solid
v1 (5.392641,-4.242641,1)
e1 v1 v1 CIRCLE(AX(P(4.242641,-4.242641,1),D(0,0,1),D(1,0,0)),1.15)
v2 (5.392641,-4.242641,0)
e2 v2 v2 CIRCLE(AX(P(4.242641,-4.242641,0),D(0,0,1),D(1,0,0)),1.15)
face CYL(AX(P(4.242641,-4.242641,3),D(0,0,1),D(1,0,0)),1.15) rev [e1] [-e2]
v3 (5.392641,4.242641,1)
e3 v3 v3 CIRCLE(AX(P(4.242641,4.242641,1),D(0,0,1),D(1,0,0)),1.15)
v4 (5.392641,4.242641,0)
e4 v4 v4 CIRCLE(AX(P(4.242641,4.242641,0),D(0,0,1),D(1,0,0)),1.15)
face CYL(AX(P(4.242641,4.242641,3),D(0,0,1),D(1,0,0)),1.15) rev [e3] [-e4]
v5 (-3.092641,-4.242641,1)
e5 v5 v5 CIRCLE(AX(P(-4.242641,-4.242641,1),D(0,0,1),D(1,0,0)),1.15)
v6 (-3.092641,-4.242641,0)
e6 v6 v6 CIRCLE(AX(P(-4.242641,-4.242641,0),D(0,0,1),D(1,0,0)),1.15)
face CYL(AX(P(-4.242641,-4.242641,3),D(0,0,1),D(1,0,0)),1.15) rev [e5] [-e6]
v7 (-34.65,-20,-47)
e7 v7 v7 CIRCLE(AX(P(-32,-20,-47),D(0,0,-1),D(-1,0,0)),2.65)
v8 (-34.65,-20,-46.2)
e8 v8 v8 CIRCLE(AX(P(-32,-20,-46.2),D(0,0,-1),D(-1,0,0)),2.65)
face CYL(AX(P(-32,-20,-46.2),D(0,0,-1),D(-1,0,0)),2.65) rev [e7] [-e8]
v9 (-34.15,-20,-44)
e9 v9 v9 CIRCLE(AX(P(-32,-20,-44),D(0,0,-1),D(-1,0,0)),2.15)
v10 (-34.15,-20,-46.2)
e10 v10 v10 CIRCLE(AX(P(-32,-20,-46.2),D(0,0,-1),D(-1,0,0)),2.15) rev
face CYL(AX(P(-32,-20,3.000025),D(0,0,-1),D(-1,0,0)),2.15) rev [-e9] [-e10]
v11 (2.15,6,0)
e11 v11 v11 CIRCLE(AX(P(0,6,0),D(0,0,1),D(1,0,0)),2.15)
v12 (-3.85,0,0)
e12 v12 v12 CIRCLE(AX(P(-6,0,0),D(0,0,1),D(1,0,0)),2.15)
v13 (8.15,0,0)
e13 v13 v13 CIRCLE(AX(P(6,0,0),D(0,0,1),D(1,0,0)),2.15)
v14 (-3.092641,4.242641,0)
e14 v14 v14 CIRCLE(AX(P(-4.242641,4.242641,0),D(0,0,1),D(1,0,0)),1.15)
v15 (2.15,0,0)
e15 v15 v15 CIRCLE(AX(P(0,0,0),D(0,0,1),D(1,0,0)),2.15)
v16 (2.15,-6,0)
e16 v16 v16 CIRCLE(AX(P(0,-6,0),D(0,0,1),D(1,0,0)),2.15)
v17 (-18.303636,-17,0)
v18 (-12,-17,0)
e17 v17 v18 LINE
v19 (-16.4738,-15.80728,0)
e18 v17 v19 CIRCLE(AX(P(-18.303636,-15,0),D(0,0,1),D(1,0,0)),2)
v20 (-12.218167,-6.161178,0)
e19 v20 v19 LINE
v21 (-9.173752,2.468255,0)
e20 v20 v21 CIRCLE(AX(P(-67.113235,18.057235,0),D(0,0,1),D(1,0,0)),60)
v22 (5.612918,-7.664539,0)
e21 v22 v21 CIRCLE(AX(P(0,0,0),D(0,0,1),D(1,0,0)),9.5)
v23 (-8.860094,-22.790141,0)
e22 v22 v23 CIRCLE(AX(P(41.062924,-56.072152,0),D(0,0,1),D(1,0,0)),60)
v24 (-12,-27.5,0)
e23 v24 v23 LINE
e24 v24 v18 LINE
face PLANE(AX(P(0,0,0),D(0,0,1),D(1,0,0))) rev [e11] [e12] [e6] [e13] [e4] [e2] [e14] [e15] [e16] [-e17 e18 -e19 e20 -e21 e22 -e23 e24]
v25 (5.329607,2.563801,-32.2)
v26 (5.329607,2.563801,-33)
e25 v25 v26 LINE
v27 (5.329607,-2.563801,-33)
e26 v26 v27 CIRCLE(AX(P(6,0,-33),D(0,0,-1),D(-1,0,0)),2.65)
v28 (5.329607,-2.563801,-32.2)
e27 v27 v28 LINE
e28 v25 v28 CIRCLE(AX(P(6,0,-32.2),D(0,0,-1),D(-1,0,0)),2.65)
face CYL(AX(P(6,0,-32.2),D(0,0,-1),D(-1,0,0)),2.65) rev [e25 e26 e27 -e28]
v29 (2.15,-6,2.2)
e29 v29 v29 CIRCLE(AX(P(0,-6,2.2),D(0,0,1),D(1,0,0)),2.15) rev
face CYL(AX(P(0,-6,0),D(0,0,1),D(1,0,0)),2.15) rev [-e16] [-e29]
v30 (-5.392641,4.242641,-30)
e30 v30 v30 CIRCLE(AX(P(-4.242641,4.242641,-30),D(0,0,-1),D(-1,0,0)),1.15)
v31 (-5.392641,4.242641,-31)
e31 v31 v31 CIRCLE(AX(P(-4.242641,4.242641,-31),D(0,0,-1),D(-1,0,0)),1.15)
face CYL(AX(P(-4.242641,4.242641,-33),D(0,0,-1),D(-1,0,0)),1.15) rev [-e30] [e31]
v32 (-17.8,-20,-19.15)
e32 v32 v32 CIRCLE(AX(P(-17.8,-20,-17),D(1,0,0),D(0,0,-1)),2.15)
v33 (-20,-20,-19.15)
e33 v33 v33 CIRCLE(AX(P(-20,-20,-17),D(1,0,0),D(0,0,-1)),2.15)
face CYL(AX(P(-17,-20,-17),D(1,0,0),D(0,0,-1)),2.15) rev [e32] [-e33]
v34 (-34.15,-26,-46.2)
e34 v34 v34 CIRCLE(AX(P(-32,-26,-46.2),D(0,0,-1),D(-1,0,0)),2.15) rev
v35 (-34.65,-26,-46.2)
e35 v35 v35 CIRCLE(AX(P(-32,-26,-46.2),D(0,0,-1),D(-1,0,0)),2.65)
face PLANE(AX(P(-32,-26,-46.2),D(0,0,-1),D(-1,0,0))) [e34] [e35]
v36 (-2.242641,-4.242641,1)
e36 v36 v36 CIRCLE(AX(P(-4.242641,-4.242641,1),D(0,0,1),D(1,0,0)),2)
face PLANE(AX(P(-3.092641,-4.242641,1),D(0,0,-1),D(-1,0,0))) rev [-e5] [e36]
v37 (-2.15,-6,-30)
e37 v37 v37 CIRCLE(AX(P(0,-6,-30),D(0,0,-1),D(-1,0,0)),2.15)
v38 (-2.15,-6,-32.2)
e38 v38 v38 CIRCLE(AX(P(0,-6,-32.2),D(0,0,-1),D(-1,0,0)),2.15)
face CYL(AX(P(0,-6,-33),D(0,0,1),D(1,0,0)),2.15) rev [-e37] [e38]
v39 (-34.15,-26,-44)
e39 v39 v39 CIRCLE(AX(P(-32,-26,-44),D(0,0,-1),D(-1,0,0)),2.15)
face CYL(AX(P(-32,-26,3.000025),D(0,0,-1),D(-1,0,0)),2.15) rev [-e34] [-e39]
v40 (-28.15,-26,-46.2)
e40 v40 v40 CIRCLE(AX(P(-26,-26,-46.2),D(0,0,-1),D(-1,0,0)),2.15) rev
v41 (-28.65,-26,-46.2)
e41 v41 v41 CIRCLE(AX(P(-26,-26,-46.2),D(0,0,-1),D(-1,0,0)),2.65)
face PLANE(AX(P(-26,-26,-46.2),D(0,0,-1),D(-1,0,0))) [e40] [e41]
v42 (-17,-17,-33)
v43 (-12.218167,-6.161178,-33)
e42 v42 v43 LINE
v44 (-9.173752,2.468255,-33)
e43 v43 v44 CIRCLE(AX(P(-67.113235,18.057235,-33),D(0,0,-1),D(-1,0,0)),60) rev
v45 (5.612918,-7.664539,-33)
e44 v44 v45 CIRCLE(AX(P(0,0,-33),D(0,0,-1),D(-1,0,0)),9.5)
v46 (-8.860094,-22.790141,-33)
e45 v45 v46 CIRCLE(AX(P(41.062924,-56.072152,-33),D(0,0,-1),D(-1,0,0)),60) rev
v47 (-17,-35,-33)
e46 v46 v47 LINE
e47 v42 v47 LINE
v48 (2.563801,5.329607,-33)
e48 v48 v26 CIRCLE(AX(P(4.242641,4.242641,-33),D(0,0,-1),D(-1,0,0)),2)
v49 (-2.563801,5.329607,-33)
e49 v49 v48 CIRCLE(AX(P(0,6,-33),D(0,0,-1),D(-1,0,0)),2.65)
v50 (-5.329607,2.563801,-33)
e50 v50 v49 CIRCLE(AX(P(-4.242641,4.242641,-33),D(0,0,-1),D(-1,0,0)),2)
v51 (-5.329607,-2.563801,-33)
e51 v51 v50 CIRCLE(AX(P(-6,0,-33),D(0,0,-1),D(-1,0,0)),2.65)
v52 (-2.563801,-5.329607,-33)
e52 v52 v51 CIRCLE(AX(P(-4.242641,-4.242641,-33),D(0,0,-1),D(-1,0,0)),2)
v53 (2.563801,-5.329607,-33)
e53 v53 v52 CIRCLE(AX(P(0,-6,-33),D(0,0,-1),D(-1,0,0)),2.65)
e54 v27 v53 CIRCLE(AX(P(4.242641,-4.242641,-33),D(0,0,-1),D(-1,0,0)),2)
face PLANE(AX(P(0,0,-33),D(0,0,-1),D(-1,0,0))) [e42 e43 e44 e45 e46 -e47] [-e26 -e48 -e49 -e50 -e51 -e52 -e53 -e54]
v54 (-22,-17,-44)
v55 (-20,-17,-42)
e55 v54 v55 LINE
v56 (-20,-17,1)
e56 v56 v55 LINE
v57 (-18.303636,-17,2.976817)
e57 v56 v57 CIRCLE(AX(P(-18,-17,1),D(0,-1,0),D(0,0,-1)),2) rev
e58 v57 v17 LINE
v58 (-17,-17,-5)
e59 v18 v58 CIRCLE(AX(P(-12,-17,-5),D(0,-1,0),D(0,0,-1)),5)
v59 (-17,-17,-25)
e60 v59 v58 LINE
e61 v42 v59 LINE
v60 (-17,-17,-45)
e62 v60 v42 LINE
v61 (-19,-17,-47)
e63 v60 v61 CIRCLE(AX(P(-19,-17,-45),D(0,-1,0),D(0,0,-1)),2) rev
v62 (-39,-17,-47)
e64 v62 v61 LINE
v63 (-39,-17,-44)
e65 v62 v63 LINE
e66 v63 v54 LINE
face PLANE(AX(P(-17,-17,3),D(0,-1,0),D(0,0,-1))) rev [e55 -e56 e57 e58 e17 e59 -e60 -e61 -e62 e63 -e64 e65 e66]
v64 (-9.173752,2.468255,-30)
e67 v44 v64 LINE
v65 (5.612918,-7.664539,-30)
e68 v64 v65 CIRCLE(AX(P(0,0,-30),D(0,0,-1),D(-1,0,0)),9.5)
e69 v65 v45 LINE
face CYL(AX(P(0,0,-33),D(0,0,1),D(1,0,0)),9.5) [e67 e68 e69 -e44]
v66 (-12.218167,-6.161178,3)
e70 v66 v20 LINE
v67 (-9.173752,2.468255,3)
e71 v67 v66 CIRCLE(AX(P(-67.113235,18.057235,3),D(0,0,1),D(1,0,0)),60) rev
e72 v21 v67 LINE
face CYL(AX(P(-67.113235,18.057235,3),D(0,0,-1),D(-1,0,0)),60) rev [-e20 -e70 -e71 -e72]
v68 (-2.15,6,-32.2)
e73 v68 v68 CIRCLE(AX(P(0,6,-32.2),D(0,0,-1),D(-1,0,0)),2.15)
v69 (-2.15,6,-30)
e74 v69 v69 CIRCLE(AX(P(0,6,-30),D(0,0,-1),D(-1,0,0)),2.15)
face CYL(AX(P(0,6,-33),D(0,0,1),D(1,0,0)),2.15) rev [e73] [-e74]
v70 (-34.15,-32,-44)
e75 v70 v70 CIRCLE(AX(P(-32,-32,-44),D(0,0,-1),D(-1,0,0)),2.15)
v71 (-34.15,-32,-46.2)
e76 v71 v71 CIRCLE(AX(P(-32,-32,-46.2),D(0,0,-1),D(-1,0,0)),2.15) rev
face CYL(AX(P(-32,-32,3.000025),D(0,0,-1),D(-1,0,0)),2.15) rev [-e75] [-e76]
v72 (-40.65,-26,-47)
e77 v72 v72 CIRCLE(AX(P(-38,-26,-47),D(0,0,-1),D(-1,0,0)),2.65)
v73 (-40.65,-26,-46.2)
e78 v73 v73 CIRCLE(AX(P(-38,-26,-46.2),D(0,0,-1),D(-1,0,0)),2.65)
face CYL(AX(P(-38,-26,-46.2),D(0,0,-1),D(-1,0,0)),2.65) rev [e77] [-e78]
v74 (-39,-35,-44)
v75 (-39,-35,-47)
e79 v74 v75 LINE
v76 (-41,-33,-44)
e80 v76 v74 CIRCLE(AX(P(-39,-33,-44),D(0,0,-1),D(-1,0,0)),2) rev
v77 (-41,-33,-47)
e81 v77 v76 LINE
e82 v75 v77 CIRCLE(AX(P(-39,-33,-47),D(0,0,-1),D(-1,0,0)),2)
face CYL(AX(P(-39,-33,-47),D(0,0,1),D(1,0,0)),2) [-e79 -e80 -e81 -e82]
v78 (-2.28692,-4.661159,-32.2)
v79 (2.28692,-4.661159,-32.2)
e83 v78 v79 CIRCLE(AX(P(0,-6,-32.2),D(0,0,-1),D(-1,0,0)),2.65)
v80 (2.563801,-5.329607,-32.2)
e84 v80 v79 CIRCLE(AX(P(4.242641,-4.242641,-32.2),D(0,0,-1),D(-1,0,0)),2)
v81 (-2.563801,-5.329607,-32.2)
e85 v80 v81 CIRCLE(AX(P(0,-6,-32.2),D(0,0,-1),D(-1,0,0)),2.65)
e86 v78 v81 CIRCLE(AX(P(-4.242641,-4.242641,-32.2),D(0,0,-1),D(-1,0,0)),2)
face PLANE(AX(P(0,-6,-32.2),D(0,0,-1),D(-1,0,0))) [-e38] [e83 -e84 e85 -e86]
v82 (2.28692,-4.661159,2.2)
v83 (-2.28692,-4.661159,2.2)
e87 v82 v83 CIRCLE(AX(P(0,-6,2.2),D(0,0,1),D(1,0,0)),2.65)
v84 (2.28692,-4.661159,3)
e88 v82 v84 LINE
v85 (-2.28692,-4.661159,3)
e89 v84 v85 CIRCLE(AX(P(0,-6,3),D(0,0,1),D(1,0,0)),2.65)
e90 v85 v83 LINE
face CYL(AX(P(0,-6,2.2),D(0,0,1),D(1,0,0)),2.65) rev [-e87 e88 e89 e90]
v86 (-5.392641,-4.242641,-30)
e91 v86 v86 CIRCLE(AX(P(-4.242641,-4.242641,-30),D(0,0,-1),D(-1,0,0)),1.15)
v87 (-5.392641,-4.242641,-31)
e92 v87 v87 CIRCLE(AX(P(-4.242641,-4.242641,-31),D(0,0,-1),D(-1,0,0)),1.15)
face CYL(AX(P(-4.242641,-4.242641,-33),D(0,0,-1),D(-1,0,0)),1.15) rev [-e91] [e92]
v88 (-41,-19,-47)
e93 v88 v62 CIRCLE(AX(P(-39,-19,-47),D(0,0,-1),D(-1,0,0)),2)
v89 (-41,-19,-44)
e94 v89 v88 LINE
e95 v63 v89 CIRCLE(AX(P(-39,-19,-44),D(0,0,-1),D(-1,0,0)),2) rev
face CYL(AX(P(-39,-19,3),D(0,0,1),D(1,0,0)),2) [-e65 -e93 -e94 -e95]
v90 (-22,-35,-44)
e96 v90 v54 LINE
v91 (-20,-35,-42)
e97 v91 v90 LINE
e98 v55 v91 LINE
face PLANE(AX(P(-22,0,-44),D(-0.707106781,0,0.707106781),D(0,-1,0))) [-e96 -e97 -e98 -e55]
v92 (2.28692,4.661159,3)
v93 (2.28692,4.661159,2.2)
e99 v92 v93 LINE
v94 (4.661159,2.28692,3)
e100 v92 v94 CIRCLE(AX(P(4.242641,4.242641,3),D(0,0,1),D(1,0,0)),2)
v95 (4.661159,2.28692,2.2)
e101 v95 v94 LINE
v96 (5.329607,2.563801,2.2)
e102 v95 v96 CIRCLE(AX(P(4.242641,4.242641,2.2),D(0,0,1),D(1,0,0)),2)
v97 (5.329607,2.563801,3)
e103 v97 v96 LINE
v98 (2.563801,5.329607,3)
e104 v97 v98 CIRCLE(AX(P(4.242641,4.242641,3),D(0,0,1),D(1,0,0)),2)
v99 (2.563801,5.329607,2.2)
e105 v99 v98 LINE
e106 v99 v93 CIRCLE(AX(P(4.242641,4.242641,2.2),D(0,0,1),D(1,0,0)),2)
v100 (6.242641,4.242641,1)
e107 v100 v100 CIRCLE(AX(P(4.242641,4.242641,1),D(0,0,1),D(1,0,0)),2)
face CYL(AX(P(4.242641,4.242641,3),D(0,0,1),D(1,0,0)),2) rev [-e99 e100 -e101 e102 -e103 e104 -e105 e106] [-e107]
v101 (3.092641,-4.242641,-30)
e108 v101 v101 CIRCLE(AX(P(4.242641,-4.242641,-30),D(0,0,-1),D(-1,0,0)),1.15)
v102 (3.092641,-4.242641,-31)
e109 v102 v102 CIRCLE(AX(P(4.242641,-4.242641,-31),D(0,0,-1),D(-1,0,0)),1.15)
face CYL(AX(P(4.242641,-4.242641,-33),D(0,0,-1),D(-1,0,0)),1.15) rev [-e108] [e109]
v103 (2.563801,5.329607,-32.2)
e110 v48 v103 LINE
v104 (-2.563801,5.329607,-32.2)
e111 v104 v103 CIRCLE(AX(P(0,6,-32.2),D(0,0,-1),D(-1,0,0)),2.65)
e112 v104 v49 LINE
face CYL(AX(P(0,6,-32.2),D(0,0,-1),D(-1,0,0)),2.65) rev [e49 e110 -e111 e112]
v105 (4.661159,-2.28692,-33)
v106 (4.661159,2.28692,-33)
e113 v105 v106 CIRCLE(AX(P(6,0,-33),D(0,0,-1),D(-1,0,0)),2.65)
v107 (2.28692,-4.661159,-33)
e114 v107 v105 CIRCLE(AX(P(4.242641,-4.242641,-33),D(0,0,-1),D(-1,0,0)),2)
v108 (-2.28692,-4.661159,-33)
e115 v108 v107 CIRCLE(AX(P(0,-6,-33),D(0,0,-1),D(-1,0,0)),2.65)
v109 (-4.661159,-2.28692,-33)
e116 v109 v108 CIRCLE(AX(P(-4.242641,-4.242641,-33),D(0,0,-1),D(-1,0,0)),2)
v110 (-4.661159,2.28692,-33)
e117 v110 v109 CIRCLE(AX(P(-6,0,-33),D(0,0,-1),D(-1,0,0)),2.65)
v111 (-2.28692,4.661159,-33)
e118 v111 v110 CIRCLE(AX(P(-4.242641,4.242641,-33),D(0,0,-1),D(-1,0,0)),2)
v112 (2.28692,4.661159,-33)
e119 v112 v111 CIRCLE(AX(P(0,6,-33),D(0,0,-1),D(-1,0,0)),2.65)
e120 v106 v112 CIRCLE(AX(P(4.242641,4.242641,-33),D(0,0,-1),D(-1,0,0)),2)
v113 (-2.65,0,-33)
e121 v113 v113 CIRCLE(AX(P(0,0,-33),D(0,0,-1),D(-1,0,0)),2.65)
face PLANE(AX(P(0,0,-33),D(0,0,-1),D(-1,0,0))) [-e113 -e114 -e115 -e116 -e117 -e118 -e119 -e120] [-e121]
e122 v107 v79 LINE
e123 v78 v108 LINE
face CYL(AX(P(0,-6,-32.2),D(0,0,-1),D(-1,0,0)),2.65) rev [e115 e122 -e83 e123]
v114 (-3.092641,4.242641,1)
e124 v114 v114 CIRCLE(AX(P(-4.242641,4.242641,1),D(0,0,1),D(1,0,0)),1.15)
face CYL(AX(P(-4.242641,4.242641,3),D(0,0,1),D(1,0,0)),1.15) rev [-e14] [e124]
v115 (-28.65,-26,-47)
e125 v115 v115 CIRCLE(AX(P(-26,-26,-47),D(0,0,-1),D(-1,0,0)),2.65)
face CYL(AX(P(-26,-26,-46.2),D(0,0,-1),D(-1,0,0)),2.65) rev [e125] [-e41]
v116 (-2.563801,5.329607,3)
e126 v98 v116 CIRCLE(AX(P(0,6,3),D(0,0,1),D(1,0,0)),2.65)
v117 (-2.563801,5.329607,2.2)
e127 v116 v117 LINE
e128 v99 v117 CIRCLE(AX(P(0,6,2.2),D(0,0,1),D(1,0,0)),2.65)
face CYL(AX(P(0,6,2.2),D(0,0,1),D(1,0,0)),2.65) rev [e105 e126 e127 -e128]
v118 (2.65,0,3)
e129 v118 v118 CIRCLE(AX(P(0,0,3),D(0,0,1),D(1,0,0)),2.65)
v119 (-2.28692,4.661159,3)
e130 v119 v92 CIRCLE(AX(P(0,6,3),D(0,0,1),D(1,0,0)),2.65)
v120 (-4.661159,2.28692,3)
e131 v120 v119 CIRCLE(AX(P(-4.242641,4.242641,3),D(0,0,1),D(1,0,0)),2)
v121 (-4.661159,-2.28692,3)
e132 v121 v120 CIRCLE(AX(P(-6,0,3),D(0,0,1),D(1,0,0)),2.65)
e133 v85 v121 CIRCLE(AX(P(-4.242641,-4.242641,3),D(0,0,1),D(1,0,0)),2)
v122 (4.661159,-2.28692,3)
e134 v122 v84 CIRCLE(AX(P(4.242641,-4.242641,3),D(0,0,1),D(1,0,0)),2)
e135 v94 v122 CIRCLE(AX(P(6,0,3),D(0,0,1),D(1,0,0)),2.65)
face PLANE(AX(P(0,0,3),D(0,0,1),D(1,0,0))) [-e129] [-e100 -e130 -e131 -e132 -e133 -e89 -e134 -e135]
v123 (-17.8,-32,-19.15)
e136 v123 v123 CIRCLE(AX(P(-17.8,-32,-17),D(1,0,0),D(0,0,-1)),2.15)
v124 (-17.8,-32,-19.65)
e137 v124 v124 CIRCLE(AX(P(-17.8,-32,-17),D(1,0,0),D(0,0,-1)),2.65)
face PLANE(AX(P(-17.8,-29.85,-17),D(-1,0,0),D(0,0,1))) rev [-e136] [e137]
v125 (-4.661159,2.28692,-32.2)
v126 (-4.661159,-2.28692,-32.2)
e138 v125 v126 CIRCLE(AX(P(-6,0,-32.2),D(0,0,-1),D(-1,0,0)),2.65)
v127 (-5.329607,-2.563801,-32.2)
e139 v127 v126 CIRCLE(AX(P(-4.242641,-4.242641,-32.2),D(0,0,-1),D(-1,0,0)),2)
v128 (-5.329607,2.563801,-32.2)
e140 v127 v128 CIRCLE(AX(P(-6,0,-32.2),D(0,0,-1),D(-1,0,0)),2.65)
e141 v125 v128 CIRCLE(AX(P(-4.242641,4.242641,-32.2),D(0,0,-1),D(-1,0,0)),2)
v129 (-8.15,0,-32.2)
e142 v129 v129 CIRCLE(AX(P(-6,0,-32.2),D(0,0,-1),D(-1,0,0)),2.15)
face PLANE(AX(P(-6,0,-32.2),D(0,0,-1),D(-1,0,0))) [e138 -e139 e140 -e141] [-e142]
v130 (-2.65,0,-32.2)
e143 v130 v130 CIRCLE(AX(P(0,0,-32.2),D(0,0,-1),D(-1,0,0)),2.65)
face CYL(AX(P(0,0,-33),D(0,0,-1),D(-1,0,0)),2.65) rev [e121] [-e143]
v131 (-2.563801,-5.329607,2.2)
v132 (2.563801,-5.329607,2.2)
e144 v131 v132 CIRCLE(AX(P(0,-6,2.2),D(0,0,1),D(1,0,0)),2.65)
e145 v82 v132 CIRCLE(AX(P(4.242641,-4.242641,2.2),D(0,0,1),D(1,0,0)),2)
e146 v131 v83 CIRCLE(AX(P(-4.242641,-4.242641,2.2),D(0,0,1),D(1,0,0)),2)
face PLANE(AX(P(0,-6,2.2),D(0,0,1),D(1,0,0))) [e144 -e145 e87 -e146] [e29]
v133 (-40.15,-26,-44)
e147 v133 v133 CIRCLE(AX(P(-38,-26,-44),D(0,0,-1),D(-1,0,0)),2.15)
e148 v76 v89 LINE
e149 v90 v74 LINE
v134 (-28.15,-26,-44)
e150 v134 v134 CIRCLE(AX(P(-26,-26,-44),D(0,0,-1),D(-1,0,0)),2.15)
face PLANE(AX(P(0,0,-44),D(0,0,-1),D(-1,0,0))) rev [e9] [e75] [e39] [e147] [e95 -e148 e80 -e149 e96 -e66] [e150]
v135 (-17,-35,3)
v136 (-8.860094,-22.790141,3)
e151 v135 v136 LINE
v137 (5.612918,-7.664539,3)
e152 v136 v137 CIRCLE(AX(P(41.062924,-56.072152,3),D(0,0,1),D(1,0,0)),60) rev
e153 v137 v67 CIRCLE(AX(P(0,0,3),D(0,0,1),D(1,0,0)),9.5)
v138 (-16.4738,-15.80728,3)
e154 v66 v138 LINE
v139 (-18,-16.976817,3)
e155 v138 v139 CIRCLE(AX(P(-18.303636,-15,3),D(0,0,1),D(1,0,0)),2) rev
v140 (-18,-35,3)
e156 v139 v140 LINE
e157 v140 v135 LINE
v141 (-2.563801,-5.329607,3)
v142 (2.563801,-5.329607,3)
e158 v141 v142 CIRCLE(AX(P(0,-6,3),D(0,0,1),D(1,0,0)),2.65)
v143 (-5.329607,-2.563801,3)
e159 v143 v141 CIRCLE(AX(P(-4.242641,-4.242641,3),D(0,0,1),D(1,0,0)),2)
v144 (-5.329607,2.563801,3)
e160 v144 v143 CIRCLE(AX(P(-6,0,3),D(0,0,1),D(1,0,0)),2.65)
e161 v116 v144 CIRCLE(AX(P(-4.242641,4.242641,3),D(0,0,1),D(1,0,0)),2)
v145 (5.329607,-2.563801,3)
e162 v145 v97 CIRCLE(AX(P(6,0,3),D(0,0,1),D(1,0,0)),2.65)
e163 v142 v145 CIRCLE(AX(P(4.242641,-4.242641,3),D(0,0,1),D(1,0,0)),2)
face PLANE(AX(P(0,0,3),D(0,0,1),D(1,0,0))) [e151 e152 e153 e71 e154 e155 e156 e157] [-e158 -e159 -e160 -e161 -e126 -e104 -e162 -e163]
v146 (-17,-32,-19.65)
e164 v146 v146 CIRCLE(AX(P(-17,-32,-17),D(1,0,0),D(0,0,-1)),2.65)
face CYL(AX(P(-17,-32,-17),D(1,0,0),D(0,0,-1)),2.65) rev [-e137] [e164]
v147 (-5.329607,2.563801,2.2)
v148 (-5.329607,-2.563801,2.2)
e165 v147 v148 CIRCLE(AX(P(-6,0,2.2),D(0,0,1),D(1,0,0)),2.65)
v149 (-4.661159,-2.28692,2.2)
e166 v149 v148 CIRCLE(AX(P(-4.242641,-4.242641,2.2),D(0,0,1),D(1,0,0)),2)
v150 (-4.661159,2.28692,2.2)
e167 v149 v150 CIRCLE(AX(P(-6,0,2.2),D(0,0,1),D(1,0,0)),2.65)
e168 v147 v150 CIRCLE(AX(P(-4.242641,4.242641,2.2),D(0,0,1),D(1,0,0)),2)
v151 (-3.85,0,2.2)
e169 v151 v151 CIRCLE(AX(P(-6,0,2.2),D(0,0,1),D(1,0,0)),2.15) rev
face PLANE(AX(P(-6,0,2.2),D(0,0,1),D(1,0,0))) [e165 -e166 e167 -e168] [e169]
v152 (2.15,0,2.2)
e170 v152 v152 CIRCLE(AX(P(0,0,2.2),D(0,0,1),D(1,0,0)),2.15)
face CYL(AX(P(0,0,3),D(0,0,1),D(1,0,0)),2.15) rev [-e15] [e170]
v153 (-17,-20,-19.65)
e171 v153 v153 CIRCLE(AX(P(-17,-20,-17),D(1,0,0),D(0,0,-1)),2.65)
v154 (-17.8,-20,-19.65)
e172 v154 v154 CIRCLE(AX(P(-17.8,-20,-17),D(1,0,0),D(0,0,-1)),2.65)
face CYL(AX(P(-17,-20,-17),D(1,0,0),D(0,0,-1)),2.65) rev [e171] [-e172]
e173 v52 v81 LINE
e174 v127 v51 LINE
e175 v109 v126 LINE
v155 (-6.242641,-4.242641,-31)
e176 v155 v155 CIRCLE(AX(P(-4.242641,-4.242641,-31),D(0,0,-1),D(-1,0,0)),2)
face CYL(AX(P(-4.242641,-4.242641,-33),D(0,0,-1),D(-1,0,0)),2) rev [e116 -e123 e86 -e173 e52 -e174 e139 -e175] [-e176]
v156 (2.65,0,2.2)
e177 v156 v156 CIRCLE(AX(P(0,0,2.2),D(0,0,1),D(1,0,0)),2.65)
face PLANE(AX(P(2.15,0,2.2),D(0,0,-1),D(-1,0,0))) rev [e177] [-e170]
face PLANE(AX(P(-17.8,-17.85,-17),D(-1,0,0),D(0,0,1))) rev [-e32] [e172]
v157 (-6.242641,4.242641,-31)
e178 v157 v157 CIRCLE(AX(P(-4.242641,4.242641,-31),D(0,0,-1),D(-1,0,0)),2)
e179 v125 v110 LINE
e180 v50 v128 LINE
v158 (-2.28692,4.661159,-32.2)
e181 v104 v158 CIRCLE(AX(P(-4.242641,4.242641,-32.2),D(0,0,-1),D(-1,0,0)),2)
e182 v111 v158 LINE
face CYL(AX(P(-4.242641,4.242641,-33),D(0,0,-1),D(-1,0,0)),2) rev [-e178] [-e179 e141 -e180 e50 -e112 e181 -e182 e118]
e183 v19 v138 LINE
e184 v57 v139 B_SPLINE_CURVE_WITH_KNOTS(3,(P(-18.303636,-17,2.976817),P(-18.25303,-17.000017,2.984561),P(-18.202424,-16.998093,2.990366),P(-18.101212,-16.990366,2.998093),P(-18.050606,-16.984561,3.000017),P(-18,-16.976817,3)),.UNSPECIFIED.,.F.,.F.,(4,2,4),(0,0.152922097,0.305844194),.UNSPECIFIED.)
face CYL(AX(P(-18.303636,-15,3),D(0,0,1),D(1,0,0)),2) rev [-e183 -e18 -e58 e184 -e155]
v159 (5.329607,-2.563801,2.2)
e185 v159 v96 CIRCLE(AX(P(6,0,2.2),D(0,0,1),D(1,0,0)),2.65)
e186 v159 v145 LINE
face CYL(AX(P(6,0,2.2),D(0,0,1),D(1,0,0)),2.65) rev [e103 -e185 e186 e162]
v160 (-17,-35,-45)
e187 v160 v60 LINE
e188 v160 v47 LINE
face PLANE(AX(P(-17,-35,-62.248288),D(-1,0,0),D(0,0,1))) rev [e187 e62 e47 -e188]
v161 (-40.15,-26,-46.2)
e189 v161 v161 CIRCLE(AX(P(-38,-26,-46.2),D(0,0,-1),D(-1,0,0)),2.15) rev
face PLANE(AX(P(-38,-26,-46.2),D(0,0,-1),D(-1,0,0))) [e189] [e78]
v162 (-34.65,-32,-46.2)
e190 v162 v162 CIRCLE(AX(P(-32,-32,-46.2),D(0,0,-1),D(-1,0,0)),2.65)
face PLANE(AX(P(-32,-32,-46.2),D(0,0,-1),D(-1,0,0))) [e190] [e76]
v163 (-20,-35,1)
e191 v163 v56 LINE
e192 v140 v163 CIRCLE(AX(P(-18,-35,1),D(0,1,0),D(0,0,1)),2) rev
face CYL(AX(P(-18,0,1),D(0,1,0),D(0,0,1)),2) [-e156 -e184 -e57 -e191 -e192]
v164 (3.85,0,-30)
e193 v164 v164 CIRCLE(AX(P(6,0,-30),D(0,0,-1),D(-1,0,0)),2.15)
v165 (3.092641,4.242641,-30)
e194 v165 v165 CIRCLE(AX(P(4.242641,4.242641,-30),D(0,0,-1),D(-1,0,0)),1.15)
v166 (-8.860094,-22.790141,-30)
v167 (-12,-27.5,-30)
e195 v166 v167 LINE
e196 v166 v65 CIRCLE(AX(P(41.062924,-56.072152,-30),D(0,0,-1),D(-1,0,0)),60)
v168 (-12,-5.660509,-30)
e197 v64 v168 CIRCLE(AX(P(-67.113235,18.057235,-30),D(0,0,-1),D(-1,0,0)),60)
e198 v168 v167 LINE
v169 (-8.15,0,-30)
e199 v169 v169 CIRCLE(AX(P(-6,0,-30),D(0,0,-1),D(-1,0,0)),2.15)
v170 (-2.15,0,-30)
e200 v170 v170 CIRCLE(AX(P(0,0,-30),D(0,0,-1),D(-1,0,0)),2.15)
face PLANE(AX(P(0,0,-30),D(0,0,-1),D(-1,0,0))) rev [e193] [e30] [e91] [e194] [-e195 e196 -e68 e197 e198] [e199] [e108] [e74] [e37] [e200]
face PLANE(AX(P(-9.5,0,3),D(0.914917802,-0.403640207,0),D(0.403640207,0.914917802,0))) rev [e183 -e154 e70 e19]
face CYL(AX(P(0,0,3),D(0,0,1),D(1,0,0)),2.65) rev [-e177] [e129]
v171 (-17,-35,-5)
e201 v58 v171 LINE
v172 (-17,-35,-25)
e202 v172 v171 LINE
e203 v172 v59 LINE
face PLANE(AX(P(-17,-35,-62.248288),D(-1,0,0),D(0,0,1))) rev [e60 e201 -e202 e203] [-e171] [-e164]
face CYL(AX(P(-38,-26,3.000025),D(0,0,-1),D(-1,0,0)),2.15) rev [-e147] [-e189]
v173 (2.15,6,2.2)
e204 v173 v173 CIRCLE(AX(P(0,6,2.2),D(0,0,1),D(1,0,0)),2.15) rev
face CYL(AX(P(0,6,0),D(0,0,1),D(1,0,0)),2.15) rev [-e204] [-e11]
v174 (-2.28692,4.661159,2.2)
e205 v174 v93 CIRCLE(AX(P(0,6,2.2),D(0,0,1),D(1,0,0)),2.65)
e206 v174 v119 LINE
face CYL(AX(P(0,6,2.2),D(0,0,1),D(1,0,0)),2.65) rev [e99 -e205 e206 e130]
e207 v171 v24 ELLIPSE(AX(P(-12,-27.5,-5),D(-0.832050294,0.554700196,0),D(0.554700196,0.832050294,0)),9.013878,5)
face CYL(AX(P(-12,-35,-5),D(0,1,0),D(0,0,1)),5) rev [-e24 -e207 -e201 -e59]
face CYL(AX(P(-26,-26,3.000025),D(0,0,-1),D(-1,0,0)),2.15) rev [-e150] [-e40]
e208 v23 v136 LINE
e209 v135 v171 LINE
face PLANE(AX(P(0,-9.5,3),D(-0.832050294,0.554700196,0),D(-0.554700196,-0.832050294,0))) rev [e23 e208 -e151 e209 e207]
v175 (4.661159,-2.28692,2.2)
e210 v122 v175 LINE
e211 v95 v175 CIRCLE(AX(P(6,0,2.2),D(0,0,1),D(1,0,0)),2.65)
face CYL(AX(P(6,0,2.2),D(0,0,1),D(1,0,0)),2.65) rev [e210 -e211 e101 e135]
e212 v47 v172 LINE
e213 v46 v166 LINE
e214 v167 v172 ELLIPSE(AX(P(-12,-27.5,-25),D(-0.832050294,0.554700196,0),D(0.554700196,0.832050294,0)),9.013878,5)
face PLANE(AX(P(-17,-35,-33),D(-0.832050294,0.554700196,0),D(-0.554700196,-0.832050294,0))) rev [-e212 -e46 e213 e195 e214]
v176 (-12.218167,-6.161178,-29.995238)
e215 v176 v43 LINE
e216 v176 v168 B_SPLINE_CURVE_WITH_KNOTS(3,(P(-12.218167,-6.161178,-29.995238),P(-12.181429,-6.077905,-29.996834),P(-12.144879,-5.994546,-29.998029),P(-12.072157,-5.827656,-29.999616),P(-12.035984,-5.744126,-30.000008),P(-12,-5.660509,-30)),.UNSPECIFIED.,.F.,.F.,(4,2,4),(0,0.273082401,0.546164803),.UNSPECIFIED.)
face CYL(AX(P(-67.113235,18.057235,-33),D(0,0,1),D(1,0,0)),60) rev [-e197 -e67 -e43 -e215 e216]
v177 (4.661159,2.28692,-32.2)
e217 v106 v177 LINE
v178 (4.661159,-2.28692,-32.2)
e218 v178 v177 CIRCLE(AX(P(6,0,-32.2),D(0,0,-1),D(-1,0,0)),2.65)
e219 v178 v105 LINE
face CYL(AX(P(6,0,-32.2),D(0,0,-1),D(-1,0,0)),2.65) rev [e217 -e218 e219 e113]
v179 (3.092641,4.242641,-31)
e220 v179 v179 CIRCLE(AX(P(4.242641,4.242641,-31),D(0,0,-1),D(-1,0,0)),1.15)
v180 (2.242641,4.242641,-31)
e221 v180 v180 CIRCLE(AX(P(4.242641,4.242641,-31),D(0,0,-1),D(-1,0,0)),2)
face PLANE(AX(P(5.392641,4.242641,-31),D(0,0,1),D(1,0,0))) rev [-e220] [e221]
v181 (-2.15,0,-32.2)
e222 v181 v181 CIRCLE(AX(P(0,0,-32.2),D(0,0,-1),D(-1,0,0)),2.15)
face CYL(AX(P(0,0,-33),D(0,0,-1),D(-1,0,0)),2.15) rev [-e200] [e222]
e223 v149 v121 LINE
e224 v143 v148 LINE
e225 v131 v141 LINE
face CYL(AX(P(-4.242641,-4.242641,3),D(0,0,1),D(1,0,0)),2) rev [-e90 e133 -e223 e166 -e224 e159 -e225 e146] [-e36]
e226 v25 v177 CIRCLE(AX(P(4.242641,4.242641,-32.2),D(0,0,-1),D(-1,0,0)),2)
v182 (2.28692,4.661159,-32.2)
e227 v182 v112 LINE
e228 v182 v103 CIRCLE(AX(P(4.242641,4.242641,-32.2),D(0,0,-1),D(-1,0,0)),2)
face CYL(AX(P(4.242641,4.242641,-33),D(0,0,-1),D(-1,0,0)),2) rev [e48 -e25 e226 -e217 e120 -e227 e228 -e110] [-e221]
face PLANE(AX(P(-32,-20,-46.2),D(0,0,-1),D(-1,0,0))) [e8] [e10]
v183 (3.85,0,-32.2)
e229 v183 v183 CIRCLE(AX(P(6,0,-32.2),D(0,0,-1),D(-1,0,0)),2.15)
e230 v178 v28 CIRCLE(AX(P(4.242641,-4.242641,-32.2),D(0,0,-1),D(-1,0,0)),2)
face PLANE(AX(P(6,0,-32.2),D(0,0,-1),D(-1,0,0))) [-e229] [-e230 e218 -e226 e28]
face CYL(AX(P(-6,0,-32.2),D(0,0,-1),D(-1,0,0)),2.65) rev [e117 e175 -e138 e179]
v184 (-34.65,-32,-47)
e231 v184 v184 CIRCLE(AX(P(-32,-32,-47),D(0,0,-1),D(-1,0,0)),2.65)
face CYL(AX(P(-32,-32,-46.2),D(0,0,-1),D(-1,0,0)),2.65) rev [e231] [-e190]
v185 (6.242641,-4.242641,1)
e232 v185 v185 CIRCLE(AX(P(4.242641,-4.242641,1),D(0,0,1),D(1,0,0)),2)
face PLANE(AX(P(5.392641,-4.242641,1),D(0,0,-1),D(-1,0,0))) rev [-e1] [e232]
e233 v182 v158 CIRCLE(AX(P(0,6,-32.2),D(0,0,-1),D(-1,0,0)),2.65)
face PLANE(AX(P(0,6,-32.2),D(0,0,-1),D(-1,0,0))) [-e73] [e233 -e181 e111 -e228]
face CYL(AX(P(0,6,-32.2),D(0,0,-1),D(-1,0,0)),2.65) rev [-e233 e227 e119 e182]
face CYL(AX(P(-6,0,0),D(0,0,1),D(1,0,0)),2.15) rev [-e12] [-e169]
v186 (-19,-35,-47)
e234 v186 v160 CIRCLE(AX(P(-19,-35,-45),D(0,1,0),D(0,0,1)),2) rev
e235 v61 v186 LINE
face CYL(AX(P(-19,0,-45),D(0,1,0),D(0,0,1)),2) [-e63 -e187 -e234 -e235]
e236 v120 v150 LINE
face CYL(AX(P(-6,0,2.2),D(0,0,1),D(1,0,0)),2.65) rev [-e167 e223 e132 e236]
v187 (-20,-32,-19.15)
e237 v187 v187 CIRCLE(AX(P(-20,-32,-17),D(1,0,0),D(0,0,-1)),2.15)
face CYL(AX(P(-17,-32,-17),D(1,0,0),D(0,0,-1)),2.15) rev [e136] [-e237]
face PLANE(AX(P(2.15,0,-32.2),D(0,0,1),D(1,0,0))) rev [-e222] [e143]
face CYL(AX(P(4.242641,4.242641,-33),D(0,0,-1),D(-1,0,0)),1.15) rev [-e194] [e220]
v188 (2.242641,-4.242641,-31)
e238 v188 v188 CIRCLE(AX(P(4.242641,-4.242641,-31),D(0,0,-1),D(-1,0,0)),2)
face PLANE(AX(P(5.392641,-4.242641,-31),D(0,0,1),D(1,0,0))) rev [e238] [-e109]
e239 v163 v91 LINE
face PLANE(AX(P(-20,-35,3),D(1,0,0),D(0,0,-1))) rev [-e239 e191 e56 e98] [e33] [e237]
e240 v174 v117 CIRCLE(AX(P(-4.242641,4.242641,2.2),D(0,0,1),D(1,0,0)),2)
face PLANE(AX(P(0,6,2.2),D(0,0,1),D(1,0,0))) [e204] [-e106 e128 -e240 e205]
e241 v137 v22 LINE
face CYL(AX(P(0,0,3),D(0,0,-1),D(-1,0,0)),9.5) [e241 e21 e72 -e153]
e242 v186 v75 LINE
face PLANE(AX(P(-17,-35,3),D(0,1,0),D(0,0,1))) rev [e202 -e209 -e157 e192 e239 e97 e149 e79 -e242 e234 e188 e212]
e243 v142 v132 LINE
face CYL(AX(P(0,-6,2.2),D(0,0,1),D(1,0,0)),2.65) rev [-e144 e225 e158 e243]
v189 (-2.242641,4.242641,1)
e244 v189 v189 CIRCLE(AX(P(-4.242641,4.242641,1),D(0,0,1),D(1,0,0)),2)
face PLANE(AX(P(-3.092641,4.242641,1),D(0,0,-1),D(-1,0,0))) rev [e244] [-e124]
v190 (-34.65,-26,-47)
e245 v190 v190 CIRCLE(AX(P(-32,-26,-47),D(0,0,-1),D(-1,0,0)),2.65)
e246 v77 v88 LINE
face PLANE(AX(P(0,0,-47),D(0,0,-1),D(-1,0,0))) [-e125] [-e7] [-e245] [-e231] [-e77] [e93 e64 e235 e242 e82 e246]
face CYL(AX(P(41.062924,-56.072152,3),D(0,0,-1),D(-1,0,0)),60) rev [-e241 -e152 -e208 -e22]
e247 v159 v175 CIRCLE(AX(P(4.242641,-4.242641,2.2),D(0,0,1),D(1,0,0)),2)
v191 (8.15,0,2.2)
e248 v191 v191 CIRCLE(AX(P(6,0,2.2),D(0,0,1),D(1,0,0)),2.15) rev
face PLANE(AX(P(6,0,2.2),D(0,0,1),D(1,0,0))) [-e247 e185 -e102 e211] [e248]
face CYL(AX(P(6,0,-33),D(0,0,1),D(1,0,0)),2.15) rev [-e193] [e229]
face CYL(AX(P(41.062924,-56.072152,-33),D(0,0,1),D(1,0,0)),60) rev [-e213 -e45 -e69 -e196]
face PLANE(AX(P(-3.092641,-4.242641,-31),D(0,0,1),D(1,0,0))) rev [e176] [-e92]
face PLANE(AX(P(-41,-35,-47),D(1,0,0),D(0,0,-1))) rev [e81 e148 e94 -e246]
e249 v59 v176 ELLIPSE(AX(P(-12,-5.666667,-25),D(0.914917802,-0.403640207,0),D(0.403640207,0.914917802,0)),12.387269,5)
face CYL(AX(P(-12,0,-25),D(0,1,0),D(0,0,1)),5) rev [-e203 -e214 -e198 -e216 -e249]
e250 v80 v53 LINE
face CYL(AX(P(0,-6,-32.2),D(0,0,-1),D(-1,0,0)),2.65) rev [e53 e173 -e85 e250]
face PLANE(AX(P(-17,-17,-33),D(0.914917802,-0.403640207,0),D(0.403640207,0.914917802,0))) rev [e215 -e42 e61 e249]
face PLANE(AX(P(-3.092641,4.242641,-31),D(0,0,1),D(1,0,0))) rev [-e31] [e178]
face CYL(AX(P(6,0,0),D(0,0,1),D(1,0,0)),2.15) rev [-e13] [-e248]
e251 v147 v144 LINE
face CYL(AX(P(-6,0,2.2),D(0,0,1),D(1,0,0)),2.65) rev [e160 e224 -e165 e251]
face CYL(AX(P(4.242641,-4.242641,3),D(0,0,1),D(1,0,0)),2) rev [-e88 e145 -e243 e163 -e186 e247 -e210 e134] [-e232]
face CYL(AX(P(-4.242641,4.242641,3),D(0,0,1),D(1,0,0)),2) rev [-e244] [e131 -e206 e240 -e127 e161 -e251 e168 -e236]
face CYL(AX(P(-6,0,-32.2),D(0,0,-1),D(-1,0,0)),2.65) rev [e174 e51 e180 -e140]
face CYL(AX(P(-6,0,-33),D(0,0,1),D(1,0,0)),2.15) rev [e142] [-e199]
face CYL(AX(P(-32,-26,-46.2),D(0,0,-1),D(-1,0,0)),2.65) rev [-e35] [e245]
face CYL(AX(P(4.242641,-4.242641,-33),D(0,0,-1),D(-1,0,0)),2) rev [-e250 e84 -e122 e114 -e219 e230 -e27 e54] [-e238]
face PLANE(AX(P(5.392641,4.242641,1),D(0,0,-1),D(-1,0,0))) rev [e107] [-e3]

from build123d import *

# Parameters (mm, degrees)
SKETCH1_R                                            = 2
BOSS_EXTRUDE1_DEPTH                                  = 3
SKETCH23_R                                           = 2.15
CUT_EXTRUDE5_DEPTH                                   = 41.422765863
SKETCH2_W                                            = 3
SKETCH2_H                                            = 18
BOSS_EXTRUDE2_DEPTH                                  = 44
SKETCH3_R                                            = 2.15
BOSS_EXTRUDE3_DEPTH                                  = 3
SKETCH5_R                                            = 2.65
CUT_EXTRUDE1_DEPTH                                   = 0.8
CUT_EXTRUDE2_START                                   = -0.8
SKETCH11_R                                           = 2.65
CUT_EXTRUDE2_DEPTH                                   = 0.8
SKETCH12_W                                           = 24
SKETCH12_H                                           = 18
SKETCH12_R                                           = 2
BOSS_EXTRUDE4_DEPTH                                  = 3
SKETCH24_R                                           = 2.15
CUT_EXTRUDE6_DEPTH                                   = 74.525505779
HOLE1_D                                              = 4.3
HOLE1_CBORE_D                                        = 5.3
HOLE1_CBORE_DEPTH                                    = 0.8
SKETCH22_R                                           = 2.65
CUT_EXTRUDE4_DEPTH                                   = 0.8
CBORE_FOR_M1_6_HEX_SOCKET_HEAD_CAP_SCREW_D           = 2.3
CBORE_FOR_M1_6_HEX_SOCKET_HEAD_CAP_SCREW_DEPTH       = 3
CBORE_FOR_M1_6_HEX_SOCKET_HEAD_CAP_SCREW_CBORE_D     = 4
CBORE_FOR_M1_6_HEX_SOCKET_HEAD_CAP_SCREW_CBORE_DEPTH = 2
CBORE_FOR_M1_6_HEX_SOCKET_HEAD_CAP_S_2_D             = 2.3
CBORE_FOR_M1_6_HEX_SOCKET_HEAD_CAP_S_2_CBORE_D       = 4
CBORE_FOR_M1_6_HEX_SOCKET_HEAD_CAP_S_2_CBORE_DEPTH   = 2
HOLE2_D                                              = 4.3
HOLE2_DEPTH                                          = 3
HOLE2_CBORE_D                                        = 5.3
HOLE2_CBORE_DEPTH                                    = 0.8
HOLE3_D                                              = 4.3
HOLE3_CBORE_D                                        = 5.3
HOLE3_CBORE_DEPTH                                    = 0.8
FILLET10_R                                           = 2
FILLET5_R                                            = 2
CHAMFER2_SIZE                                        = 2
FILLET7_R                                            = 60
REDONDEO1_R                                          = 5


with BuildPart() as part:
    # Sketch1 → Boss-Extrude1 (new body)
    with BuildSketch(Plane.XY):
        with BuildLine():
            Line((0, -9.5), (-17, -35))
            Line((-17, -35), (-20, -35))
            Line((-20, -35), (-20, -17))
            Line((-20, -17), (-17, -17))
            Line((-17, -17), (-9.5, 0))
            ThreePointArc((-9.5, 0), (6.717514421, 6.717514421), (0, -9.5))
        make_face()
        with Locations((-6, 0)):
            Circle(SKETCH1_R, mode=Mode.SUBTRACT)
        with Locations((0, -6)):
            Circle(SKETCH1_R, mode=Mode.SUBTRACT)
        with Locations((6, 0)):
            Circle(SKETCH1_R, mode=Mode.SUBTRACT)
        with Locations((0, 6)):
            Circle(SKETCH1_R, mode=Mode.SUBTRACT)
    extrude(amount=BOSS_EXTRUDE1_DEPTH)

    # Sketch23 → Cut-Extrude5 (cut, through all)
    with BuildSketch(Plane.XY.offset(3)):
        with Locations((6, 0)):
            Circle(SKETCH23_R)
        with Locations((0, -6)):
            Circle(SKETCH23_R)
        with Locations((-6, 0)):
            Circle(SKETCH23_R)
        with Locations((0, 6)):
            Circle(SKETCH23_R)
    extrude(amount=-CUT_EXTRUDE5_DEPTH, mode=Mode.SUBTRACT)

    # Sketch2 → Boss-Extrude2 (add)
    with BuildSketch(Plane(origin=(0, 0, 0), x_dir=(-1, 0, 0), z_dir=(0, 0, -1))):
        with Locations((18.5, -26)):
            Rectangle(SKETCH2_W, SKETCH2_H)
    extrude(amount=BOSS_EXTRUDE2_DEPTH)

    # Sketch3 → Boss-Extrude3 (add)
    with BuildSketch(Plane(origin=(0, 0, -30), x_dir=(-1, 0, 0), z_dir=(0, 0, -1))):
        with BuildLine():
            Line((20, -17), (17, -17))
            Line((17, -17), (9.5, 0))
            ThreePointArc((9.5, 0), (-6.717514421, 6.717514421), (0, -9.5))
            Line((0, -9.5), (17, -35))
            Line((17, -35), (20, -35))
            Line((20, -35), (20, -17))
        make_face()
        with Locations(Location((0, -6, 0), (0, 0, 180))):
            Circle(SKETCH3_R, mode=Mode.SUBTRACT)
        with Locations(Location((-6, 0, 0), (0, 0, 180))):
            Circle(SKETCH3_R, mode=Mode.SUBTRACT)
        with Locations(Location((6, 0, 0), (0, 0, 180))):
            Circle(SKETCH3_R, mode=Mode.SUBTRACT)
        with Locations(Location((0, 6, 0), (0, 0, 180))):
            Circle(SKETCH3_R, mode=Mode.SUBTRACT)
    extrude(amount=BOSS_EXTRUDE3_DEPTH)

    # Sketch5 → Cut-Extrude1 (cut)
    with BuildSketch(Plane.XY.offset(3)):
        with Locations((0, -6)):
            Circle(SKETCH5_R)
        with Locations((-6, 0)):
            Circle(SKETCH5_R)
        with Locations((0, 6)):
            Circle(SKETCH5_R)
        with Locations((6, 0)):
            Circle(SKETCH5_R)
    extrude(amount=-CUT_EXTRUDE1_DEPTH, mode=Mode.SUBTRACT)

    # Sketch11 → Cut-Extrude2 (cut)
    with BuildSketch(Plane(origin=(0, 0, -33), x_dir=(-1, 0, 0), z_dir=(0, 0, -1)).offset(CUT_EXTRUDE2_START)):
        with Locations(Location((0, 6, 0), (0, 0, 180))):
            Circle(SKETCH11_R)
        with Locations(Location((-6, 0, 0), (0, 0, 180))):
            Circle(SKETCH11_R)
        with Locations(Location((0, -6, 0), (0, 0, 180))):
            Circle(SKETCH11_R)
        with Locations(Location((6, 0, 0), (0, 0, 180))):
            Circle(SKETCH11_R)
    extrude(amount=CUT_EXTRUDE2_DEPTH, mode=Mode.SUBTRACT)

    # Sketch12 → Boss-Extrude4 (add)
    with BuildSketch(Plane(origin=(0, 0, -44), x_dir=(-1, 0, 0), z_dir=(0, 0, -1))):
        with Locations((29, -26)):
            Rectangle(SKETCH12_W, SKETCH12_H)
        with Locations((38, -26)):
            Circle(SKETCH12_R, mode=Mode.SUBTRACT)
        with Locations((32, -32)):
            Circle(SKETCH12_R, mode=Mode.SUBTRACT)
        with Locations((32, -26)):
            Circle(SKETCH12_R, mode=Mode.SUBTRACT)
        with Locations((32, -20)):
            Circle(SKETCH12_R, mode=Mode.SUBTRACT)
        with Locations((26, -26)):
            Circle(SKETCH12_R, mode=Mode.SUBTRACT)
    extrude(amount=BOSS_EXTRUDE4_DEPTH)

    # Sketch24 → Cut-Extrude6 (cut, through all)
    with BuildSketch(Plane(origin=(0, 0, -47), x_dir=(-1, 0, 0), z_dir=(0, 0, -1))):
        with Locations((32, -20)):
            Circle(SKETCH24_R)
        with Locations((26, -26)):
            Circle(SKETCH24_R)
        with Locations((32, -26)):
            Circle(SKETCH24_R)
        with Locations((38, -26)):
            Circle(SKETCH24_R)
        with Locations((32, -32)):
            Circle(SKETCH24_R)
    extrude(amount=-CUT_EXTRUDE6_DEPTH, mode=Mode.SUBTRACT)

    # Hole1 (through all)
    with Locations(Plane(origin=(-17, 0, 0), x_dir=(0, 0, -1), z_dir=(1, 0, 0))):
        with Locations((17, -20), (17, -32)):
            CounterBoreHole(HOLE1_D / 2, HOLE1_CBORE_D / 2, HOLE1_CBORE_DEPTH)

    # Sketch22 → Cut-Extrude4 (cut)
    with BuildSketch(Plane(origin=(0, 0, -47), x_dir=(-1, 0, 0), z_dir=(0, 0, -1))):
        with Locations((32, -32)):
            Circle(SKETCH22_R)
        with Locations((38, -26)):
            Circle(SKETCH22_R)
        with Locations((32, -26)):
            Circle(SKETCH22_R)
        with Locations((32, -20)):
            Circle(SKETCH22_R)
        with Locations((26, -26)):
            Circle(SKETCH22_R)
    extrude(amount=-CUT_EXTRUDE4_DEPTH, mode=Mode.SUBTRACT)

    # CBORE for M1.6 Hex Socket Head Cap Screw
    with Locations(Plane.XY.offset(3)):
        with Locations((-4.242640687, -4.242640687), (4.242640687, -4.242640687), (4.242640687, 4.242640687), (-4.242640687, 4.242640687)):
            CounterBoreHole(CBORE_FOR_M1_6_HEX_SOCKET_HEAD_CAP_SCREW_D / 2, CBORE_FOR_M1_6_HEX_SOCKET_HEAD_CAP_SCREW_CBORE_D / 2, CBORE_FOR_M1_6_HEX_SOCKET_HEAD_CAP_SCREW_CBORE_DEPTH, depth=CBORE_FOR_M1_6_HEX_SOCKET_HEAD_CAP_SCREW_DEPTH)

    # CBORE for M1.6 Hex Socket Head Cap S 2 (through all)
    with Locations(Plane(origin=(0, 0, -33), x_dir=(-1, 0, 0), z_dir=(0, 0, -1))):
        with Locations((4.242640687, 4.242640687), (4.242640687, -4.242640687), (-4.242640687, -4.242640687), (-4.242640687, 4.242640687)):
            CounterBoreHole(CBORE_FOR_M1_6_HEX_SOCKET_HEAD_CAP_S_2_D / 2, CBORE_FOR_M1_6_HEX_SOCKET_HEAD_CAP_S_2_CBORE_D / 2, CBORE_FOR_M1_6_HEX_SOCKET_HEAD_CAP_S_2_CBORE_DEPTH)

    # Hole2
    with Locations(Plane.XY.offset(3)):
        with Locations((0, 0)):
            CounterBoreHole(HOLE2_D / 2, HOLE2_CBORE_D / 2, HOLE2_CBORE_DEPTH, depth=HOLE2_DEPTH)

    # Hole3 (through all)
    with Locations(Plane(origin=(0, 0, -33), x_dir=(-1, 0, 0), z_dir=(0, 0, -1))):
        with Locations((0, 0)):
            CounterBoreHole(HOLE3_D / 2, HOLE3_CBORE_D / 2, HOLE3_CBORE_DEPTH)

    # Fillet10
    fillet10_edges = [part.edges().sort_by_distance(p)[0] for p in [
        (-17, -17, 1.5),
    ]]
    fillet(fillet10_edges, radius=FILLET10_R)

    # Fillet5
    fillet5_edges = [part.edges().sort_by_distance(p)[0] for p in [
        (-41, -17, -45.5),
        (-41, -35, -45.5),
        (-17, -26, -47),
        (-20, -26, 3),
    ]]
    fillet(fillet5_edges, radius=FILLET5_R)

    # Chamfer2
    chamfer2_edges = [part.edges().sort_by_distance(p)[0] for p in [
        (-20, -26, -44),
    ]]
    chamfer(chamfer2_edges, length=CHAMFER2_SIZE)

    # Fillet7
    fillet7_edges = [part.edges().sort_by_distance(p)[0] for p in [
        (0, -9.5, 1.5),
        (-9.5, 0, 1.5),
        (-9.5, 0, -31.5),
        (0, -9.5, -31.5),
    ]]
    fillet(fillet7_edges, radius=FILLET7_R)

    # Redondeo1
    # the kernel refuses this fillet: 5 mm, written as the material it adds along each edge
    with BuildSketch(Plane(origin=(-17, -47.5, -30), x_dir=(0, 0, 1), z_dir=(0, 1, 0))) as redondeo1_piece_1_section:
        with BuildLine():
            CenterArc((REDONDEO1_R, REDONDEO1_R), REDONDEO1_R, 180, 90)
            Line((0, REDONDEO1_R), (0, 0))
            Line((0, 0), (REDONDEO1_R, 0))
        make_face()
    redondeo1_piece_1 = extrude(amount=43, mode=Mode.PRIVATE)
    redondeo1_piece_1 = split(redondeo1_piece_1, bisect_by=Plane(origin=(-12.168719693, -27.753079539, -28.835648112), z_dir=(-0.8320502943378423, 0.5547001962252313, 0)), keep=Keep.TOP, mode=Mode.PRIVATE)
    redondeo1_piece_1 = split(redondeo1_piece_1, bisect_by=Plane(origin=(-19.867910191, -23.500596432, -28.835648112), z_dir=(0.9149178015729305, -0.40364020657629746, 0)), keep=Keep.TOP, mode=Mode.PRIVATE)
    add(redondeo1_piece_1)
    with BuildSketch(Plane(origin=(-17, -47.5, 0), x_dir=(1, 0, 0), z_dir=(0, 1, 0))) as redondeo1_piece_2_section:
        with BuildLine():
            CenterArc((REDONDEO1_R, REDONDEO1_R), REDONDEO1_R, 180, 90)
            Line((0, REDONDEO1_R), (0, 0))
            Line((0, 0), (REDONDEO1_R, 0))
        make_face()
    redondeo1_piece_2 = extrude(amount=30.5, mode=Mode.PRIVATE)
    redondeo1_piece_2 = split(redondeo1_piece_2, bisect_by=Plane(origin=(-12.168719693, -27.753079539, -1.164351888), z_dir=(-0.8320502943378424, 0.5547001962252313, 0)), keep=Keep.TOP, mode=Mode.PRIVATE)
    add(redondeo1_piece_2)


solid = part.part
